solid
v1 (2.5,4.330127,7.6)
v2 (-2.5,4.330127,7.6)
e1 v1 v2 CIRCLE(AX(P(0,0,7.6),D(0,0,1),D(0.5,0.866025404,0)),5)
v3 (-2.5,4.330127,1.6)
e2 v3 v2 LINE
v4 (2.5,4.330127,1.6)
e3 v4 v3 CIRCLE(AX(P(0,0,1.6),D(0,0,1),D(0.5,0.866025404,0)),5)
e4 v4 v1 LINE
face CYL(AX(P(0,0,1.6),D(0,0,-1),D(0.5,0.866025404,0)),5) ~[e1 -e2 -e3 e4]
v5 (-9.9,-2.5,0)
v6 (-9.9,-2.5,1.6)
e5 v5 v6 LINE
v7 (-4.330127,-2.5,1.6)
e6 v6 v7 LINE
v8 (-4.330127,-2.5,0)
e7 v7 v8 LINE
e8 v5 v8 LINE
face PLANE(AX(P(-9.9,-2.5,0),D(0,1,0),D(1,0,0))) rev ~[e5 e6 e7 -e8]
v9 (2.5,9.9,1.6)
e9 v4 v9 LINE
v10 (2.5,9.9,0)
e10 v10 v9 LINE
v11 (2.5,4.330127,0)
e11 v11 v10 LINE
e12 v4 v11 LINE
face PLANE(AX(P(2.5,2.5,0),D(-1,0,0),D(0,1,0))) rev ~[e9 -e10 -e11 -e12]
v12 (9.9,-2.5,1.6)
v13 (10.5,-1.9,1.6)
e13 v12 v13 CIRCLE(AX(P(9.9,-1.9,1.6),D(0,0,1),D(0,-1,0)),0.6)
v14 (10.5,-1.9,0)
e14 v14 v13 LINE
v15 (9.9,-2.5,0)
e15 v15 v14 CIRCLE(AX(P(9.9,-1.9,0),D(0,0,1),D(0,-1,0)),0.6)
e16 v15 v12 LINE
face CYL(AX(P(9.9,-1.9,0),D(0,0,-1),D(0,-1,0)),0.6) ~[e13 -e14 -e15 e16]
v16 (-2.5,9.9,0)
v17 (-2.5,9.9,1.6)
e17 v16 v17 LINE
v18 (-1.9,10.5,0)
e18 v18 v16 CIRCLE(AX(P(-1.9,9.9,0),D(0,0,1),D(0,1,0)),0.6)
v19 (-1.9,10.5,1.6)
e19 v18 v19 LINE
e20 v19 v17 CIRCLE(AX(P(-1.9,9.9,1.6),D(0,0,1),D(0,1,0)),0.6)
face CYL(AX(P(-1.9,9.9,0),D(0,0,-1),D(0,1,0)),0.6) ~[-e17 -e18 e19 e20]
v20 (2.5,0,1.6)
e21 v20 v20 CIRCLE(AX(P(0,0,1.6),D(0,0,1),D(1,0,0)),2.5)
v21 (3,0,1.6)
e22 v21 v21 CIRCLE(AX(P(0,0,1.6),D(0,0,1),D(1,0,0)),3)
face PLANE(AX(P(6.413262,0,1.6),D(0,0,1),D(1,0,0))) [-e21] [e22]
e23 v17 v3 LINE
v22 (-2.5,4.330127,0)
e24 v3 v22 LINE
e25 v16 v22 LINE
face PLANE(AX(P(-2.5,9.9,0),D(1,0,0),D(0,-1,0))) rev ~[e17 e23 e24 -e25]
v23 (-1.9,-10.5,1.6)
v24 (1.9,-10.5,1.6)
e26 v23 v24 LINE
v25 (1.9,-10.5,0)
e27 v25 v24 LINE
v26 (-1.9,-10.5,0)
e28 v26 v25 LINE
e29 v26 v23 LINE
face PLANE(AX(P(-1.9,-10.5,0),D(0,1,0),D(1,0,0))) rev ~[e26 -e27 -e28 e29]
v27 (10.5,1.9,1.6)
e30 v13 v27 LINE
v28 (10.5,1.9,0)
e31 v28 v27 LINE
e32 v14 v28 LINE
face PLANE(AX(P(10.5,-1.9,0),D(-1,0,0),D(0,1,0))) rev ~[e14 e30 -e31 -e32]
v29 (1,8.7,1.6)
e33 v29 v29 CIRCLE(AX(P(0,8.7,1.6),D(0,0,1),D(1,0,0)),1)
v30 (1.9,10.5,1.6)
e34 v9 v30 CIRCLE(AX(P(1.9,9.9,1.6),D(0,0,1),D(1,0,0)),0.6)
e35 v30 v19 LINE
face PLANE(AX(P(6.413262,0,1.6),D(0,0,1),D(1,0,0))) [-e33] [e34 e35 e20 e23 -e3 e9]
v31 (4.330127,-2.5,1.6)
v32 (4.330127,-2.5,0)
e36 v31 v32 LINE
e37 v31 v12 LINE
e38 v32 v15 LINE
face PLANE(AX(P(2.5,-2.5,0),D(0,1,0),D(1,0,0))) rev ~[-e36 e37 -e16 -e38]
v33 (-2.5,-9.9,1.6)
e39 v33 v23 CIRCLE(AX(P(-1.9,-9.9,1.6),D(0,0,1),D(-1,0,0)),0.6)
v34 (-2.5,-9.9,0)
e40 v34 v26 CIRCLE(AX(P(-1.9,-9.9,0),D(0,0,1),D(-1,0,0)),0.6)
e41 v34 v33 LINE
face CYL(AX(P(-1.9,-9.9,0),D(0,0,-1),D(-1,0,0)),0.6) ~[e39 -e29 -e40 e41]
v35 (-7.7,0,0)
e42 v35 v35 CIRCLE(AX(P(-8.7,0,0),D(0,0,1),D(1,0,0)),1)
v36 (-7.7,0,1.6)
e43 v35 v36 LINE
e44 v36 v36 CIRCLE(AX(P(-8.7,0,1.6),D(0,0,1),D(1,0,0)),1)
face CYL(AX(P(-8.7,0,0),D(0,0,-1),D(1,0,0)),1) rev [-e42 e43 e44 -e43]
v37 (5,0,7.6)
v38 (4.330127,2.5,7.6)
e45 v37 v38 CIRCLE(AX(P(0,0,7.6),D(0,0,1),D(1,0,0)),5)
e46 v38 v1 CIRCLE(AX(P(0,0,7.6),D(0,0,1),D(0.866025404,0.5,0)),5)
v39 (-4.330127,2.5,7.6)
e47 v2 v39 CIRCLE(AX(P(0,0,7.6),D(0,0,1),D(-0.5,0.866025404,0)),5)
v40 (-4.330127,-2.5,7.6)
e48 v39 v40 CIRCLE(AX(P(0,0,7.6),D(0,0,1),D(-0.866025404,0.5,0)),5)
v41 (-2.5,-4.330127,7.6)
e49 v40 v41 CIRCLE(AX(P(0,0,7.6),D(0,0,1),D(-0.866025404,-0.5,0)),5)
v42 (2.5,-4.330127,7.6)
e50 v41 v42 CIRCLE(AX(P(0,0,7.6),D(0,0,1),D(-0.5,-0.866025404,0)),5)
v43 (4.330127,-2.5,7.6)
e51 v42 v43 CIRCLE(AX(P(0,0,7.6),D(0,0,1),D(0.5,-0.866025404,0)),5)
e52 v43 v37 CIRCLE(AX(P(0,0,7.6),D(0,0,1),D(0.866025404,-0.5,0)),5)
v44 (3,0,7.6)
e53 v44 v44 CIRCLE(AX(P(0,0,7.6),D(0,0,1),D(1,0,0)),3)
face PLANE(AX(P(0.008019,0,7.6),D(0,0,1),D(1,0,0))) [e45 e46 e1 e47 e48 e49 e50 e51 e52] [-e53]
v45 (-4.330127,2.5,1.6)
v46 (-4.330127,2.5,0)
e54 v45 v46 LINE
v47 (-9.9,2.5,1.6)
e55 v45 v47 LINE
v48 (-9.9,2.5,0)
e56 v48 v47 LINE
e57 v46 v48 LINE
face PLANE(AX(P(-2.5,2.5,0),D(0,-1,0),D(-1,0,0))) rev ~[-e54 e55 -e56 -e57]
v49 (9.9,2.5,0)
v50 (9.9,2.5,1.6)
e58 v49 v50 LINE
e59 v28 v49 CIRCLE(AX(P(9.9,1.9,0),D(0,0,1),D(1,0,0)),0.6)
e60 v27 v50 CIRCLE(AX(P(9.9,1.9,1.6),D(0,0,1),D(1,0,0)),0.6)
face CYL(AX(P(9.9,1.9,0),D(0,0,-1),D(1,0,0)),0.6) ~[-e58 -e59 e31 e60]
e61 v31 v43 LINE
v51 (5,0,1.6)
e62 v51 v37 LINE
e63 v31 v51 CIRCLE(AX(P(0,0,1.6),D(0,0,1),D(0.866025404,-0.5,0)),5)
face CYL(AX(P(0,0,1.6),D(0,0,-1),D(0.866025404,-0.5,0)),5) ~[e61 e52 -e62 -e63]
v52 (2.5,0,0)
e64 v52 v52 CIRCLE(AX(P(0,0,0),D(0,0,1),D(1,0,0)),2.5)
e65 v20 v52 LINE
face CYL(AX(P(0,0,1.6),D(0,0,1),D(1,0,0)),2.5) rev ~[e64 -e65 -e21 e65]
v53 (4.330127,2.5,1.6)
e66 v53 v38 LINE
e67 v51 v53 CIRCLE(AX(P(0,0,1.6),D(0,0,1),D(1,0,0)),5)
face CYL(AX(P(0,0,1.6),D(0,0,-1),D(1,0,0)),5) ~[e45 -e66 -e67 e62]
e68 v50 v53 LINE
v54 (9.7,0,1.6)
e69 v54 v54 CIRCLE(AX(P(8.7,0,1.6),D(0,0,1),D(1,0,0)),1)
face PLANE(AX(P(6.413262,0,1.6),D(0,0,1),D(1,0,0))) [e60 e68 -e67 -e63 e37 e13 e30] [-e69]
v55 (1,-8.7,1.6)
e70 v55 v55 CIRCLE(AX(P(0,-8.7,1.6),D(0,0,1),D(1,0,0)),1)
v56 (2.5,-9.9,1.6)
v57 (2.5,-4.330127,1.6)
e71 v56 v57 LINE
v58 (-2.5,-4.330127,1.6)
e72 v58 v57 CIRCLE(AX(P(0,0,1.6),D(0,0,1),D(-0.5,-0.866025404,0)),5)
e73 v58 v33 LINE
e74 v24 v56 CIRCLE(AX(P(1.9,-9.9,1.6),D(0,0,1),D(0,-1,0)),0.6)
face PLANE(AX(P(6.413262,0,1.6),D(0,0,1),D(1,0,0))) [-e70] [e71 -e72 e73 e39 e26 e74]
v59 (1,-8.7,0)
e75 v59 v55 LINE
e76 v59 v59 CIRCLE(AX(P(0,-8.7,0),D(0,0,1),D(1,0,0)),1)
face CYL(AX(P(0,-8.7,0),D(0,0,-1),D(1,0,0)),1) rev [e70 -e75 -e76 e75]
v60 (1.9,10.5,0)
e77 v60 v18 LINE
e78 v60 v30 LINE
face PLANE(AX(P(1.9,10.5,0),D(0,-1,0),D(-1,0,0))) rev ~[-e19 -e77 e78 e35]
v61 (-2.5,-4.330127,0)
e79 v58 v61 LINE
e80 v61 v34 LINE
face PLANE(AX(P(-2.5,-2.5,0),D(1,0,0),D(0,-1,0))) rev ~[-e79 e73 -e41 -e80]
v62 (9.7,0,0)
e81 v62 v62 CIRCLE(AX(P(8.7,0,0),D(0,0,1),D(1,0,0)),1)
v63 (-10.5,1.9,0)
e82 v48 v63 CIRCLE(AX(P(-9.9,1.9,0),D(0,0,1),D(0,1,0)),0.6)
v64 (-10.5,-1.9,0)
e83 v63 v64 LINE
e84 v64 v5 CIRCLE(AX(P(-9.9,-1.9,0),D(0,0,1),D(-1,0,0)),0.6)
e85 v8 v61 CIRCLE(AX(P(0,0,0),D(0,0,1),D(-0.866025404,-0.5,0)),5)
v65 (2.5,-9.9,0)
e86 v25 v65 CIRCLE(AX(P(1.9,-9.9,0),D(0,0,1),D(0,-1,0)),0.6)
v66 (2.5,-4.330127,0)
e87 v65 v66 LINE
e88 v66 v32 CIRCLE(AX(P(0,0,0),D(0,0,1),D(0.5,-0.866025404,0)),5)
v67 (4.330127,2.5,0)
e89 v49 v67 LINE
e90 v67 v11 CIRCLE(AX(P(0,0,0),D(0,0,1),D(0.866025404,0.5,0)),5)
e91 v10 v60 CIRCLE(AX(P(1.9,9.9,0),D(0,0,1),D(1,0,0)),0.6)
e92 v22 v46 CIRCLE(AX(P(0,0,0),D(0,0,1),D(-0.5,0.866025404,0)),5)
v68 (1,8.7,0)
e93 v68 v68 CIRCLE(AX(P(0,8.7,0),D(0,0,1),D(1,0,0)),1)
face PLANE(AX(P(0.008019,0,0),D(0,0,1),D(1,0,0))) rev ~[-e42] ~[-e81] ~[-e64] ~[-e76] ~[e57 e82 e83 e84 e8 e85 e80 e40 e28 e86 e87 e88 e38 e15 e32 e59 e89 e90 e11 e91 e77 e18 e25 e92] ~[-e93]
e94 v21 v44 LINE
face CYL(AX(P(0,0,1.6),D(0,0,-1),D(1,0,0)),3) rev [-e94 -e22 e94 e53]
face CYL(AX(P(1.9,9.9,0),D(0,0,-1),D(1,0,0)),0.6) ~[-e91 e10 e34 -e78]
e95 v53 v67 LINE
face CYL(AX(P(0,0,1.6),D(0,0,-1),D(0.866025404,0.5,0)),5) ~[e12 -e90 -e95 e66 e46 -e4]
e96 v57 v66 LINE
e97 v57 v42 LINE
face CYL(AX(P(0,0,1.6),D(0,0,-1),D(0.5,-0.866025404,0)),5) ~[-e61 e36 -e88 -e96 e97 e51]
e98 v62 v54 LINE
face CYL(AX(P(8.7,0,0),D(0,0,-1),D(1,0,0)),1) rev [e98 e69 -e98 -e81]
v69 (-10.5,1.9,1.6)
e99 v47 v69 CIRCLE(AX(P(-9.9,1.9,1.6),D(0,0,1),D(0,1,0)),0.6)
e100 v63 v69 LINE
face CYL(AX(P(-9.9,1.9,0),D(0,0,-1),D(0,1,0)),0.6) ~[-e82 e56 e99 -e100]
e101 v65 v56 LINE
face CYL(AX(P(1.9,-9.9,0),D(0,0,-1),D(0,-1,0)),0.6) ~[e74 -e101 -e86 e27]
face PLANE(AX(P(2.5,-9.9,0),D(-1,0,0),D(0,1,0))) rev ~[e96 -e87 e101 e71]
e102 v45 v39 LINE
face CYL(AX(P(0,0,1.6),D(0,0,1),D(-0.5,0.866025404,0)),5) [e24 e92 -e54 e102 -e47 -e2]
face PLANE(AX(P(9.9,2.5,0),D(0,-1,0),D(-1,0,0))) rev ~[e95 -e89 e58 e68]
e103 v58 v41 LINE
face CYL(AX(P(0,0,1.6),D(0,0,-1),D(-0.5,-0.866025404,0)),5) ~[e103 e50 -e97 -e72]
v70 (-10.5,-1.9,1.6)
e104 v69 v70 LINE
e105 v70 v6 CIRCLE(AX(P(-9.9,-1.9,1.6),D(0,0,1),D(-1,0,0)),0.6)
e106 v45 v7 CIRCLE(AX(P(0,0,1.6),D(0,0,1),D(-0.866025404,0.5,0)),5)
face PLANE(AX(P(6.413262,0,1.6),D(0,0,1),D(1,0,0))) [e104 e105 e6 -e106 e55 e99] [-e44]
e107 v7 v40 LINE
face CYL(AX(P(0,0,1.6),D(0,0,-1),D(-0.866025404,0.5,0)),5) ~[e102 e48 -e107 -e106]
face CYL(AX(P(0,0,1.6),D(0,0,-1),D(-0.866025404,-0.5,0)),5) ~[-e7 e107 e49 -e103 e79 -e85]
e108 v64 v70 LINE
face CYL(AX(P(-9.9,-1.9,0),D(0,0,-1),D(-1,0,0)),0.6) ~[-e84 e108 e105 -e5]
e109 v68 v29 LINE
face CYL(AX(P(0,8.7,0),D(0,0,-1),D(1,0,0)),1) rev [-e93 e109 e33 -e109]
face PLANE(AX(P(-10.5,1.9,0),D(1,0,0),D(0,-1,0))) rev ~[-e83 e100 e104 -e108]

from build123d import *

# Parameters (mm, degrees)
F0_R     = 1
F0_W     = 5
F0_H     = 5
F1_DEPTH = 1.6
F2_R     = 3
F3_DEPTH = 6
F4_DEPTH = 1.6
F5_R     = 2.5
F6_DEPTH = 1.6


with BuildPart() as f1:
    # F0 (on Top) → F1 (new body)
    with BuildSketch(Plane.XY):
        with BuildLine():
            ThreePointArc((10.5, 1.9), (10.3242640687, 2.3242640687), (9.9, 2.5))
            Line((9.9, 2.5), (2.5, 2.5))
            Line((2.5, 2.5), (2.5, -2.5))
            Line((2.5, -2.5), (9.9, -2.5))
            ThreePointArc((9.9, -2.5), (10.3242640687, -2.3242640687), (10.5, -1.9))
            Line((10.5, -1.9), (10.5, 1.9))
        make_face()
        with Locations((8.7, 0)):
            Circle(F0_R, mode=Mode.SUBTRACT)
        Rectangle(F0_W, F0_H)
        with BuildLine():
            Line((-2.5, 2.5), (2.5, 2.5))
            Line((2.5, 2.5), (2.5, 9.9))
            ThreePointArc((2.5, 9.9), (2.3242640687, 10.3242640687), (1.9, 10.5))
            Line((1.9, 10.5), (-1.9, 10.5))
            ThreePointArc((-1.9, 10.5), (-2.3242640687, 10.3242640687), (-2.5, 9.9))
            Line((-2.5, 9.9), (-2.5, 2.5))
        make_face()
        with Locations((0, 8.7)):
            Circle(F0_R, mode=Mode.SUBTRACT)
        with BuildLine():
            Line((-2.5, -2.5), (-2.5, 2.5))
            Line((-2.5, 2.5), (-9.9, 2.5))
            ThreePointArc((-9.9, 2.5), (-10.3242640687, 2.3242640687), (-10.5, 1.9))
            Line((-10.5, 1.9), (-10.5, -1.9))
            ThreePointArc((-10.5, -1.9), (-10.3242640687, -2.3242640687), (-9.9, -2.5))
            Line((-9.9, -2.5), (-2.5, -2.5))
        make_face()
        with Locations((-8.7, 0)):
            Circle(F0_R, mode=Mode.SUBTRACT)
        with BuildLine():
            Line((2.5, -9.9), (2.5, -2.5))
            Line((2.5, -2.5), (-2.5, -2.5))
            Line((-2.5, -2.5), (-2.5, -9.9))
            ThreePointArc((-2.5, -9.9), (-2.3242640687, -10.3242640687), (-1.9, -10.5))
            Line((-1.9, -10.5), (1.9, -10.5))
            ThreePointArc((1.9, -10.5), (2.3242640687, -10.3242640687), (2.5, -9.9))
        make_face()
        with Locations((0, -8.7)):
            Circle(F0_R, mode=Mode.SUBTRACT)
    extrude(amount=F1_DEPTH)

    # F2 (on face) → F3 (join)
    with BuildSketch(Plane.XY.offset(1.6)):
        with BuildLine():
            ThreePointArc((4.3301270189, -2.5), (4.8296291314, -1.2940952255), (5, 0))
            ThreePointArc((5, 0), (4.8296291314, 1.2940952255), (4.3301270189, 2.5))
            Line((4.3301270189, 2.5), (2.5, 2.5))
            Line((2.5, 2.5), (2.5, 4.3301270189))
            ThreePointArc((2.5, 4.3301270189), (0, 5), (-2.5, 4.3301270189))
            Line((-2.5, 4.3301270189), (-2.5, 2.5))
            Line((-2.5, 2.5), (-4.3301270189, 2.5))
            ThreePointArc((-4.3301270189, 2.5), (-5, 0), (-4.3301270189, -2.5))
            Line((-4.3301270189, -2.5), (-2.5, -2.5))
            Line((-2.5, -2.5), (-2.5, -4.3301270189))
            ThreePointArc((-2.5, -4.3301270189), (0, -5), (2.5, -4.3301270189))
            Line((2.5, -4.3301270189), (2.5, -2.5))
            Line((2.5, -2.5), (4.3301270189, -2.5))
        make_face()
        Circle(F2_R, mode=Mode.SUBTRACT)
        with BuildLine():
            ThreePointArc((-4.3301270189, -2.5), (-3.5355339059, -3.5355339059), (-2.5, -4.3301270189))
            Line((-2.5, -4.3301270189), (-2.5, -2.5))
            Line((-2.5, -2.5), (-4.3301270189, -2.5))
        make_face()
        with BuildLine():
            ThreePointArc((2.5, -4.3301270189), (3.5355339059, -3.5355339059), (4.3301270189, -2.5))
            Line((4.3301270189, -2.5), (2.5, -2.5))
            Line((2.5, -2.5), (2.5, -4.3301270189))
        make_face()
        with BuildLine():
            Line((2.5, 2.5), (4.3301270189, 2.5))
            ThreePointArc((4.3301270189, 2.5), (3.5355339059, 3.5355339059), (2.5, 4.3301270189))
            Line((2.5, 4.3301270189), (2.5, 2.5))
        make_face()
        with BuildLine():
            Line((-2.5, 2.5), (-2.5, 4.3301270189))
            ThreePointArc((-2.5, 4.3301270189), (-3.5355339059, 3.5355339059), (-4.3301270189, 2.5))
            Line((-4.3301270189, 2.5), (-2.5, 2.5))
        make_face()
    extrude(amount=F3_DEPTH)

    # F4 (add, through all): faces of the model
    f4_faces = [f1.faces().sort_by_distance(p)[0] for p in [
        (-3.1629509292, 3.1629509292, 1.6),
        (3.1629509292, 3.1629509292, 1.6),
        (-3.1629509292, -3.1629509292, 1.6),
        (3.1629509292, -3.1629509292, 1.6),
    ]]
    extrude(f4_faces, amount=F4_DEPTH)

    # F5 (on face) → F6 (cut, through all)
    with BuildSketch(Plane.XY.offset(1.6)):
        Circle(F5_R)
    extrude(amount=-F6_DEPTH, mode=Mode.SUBTRACT)


solid = f1.part
